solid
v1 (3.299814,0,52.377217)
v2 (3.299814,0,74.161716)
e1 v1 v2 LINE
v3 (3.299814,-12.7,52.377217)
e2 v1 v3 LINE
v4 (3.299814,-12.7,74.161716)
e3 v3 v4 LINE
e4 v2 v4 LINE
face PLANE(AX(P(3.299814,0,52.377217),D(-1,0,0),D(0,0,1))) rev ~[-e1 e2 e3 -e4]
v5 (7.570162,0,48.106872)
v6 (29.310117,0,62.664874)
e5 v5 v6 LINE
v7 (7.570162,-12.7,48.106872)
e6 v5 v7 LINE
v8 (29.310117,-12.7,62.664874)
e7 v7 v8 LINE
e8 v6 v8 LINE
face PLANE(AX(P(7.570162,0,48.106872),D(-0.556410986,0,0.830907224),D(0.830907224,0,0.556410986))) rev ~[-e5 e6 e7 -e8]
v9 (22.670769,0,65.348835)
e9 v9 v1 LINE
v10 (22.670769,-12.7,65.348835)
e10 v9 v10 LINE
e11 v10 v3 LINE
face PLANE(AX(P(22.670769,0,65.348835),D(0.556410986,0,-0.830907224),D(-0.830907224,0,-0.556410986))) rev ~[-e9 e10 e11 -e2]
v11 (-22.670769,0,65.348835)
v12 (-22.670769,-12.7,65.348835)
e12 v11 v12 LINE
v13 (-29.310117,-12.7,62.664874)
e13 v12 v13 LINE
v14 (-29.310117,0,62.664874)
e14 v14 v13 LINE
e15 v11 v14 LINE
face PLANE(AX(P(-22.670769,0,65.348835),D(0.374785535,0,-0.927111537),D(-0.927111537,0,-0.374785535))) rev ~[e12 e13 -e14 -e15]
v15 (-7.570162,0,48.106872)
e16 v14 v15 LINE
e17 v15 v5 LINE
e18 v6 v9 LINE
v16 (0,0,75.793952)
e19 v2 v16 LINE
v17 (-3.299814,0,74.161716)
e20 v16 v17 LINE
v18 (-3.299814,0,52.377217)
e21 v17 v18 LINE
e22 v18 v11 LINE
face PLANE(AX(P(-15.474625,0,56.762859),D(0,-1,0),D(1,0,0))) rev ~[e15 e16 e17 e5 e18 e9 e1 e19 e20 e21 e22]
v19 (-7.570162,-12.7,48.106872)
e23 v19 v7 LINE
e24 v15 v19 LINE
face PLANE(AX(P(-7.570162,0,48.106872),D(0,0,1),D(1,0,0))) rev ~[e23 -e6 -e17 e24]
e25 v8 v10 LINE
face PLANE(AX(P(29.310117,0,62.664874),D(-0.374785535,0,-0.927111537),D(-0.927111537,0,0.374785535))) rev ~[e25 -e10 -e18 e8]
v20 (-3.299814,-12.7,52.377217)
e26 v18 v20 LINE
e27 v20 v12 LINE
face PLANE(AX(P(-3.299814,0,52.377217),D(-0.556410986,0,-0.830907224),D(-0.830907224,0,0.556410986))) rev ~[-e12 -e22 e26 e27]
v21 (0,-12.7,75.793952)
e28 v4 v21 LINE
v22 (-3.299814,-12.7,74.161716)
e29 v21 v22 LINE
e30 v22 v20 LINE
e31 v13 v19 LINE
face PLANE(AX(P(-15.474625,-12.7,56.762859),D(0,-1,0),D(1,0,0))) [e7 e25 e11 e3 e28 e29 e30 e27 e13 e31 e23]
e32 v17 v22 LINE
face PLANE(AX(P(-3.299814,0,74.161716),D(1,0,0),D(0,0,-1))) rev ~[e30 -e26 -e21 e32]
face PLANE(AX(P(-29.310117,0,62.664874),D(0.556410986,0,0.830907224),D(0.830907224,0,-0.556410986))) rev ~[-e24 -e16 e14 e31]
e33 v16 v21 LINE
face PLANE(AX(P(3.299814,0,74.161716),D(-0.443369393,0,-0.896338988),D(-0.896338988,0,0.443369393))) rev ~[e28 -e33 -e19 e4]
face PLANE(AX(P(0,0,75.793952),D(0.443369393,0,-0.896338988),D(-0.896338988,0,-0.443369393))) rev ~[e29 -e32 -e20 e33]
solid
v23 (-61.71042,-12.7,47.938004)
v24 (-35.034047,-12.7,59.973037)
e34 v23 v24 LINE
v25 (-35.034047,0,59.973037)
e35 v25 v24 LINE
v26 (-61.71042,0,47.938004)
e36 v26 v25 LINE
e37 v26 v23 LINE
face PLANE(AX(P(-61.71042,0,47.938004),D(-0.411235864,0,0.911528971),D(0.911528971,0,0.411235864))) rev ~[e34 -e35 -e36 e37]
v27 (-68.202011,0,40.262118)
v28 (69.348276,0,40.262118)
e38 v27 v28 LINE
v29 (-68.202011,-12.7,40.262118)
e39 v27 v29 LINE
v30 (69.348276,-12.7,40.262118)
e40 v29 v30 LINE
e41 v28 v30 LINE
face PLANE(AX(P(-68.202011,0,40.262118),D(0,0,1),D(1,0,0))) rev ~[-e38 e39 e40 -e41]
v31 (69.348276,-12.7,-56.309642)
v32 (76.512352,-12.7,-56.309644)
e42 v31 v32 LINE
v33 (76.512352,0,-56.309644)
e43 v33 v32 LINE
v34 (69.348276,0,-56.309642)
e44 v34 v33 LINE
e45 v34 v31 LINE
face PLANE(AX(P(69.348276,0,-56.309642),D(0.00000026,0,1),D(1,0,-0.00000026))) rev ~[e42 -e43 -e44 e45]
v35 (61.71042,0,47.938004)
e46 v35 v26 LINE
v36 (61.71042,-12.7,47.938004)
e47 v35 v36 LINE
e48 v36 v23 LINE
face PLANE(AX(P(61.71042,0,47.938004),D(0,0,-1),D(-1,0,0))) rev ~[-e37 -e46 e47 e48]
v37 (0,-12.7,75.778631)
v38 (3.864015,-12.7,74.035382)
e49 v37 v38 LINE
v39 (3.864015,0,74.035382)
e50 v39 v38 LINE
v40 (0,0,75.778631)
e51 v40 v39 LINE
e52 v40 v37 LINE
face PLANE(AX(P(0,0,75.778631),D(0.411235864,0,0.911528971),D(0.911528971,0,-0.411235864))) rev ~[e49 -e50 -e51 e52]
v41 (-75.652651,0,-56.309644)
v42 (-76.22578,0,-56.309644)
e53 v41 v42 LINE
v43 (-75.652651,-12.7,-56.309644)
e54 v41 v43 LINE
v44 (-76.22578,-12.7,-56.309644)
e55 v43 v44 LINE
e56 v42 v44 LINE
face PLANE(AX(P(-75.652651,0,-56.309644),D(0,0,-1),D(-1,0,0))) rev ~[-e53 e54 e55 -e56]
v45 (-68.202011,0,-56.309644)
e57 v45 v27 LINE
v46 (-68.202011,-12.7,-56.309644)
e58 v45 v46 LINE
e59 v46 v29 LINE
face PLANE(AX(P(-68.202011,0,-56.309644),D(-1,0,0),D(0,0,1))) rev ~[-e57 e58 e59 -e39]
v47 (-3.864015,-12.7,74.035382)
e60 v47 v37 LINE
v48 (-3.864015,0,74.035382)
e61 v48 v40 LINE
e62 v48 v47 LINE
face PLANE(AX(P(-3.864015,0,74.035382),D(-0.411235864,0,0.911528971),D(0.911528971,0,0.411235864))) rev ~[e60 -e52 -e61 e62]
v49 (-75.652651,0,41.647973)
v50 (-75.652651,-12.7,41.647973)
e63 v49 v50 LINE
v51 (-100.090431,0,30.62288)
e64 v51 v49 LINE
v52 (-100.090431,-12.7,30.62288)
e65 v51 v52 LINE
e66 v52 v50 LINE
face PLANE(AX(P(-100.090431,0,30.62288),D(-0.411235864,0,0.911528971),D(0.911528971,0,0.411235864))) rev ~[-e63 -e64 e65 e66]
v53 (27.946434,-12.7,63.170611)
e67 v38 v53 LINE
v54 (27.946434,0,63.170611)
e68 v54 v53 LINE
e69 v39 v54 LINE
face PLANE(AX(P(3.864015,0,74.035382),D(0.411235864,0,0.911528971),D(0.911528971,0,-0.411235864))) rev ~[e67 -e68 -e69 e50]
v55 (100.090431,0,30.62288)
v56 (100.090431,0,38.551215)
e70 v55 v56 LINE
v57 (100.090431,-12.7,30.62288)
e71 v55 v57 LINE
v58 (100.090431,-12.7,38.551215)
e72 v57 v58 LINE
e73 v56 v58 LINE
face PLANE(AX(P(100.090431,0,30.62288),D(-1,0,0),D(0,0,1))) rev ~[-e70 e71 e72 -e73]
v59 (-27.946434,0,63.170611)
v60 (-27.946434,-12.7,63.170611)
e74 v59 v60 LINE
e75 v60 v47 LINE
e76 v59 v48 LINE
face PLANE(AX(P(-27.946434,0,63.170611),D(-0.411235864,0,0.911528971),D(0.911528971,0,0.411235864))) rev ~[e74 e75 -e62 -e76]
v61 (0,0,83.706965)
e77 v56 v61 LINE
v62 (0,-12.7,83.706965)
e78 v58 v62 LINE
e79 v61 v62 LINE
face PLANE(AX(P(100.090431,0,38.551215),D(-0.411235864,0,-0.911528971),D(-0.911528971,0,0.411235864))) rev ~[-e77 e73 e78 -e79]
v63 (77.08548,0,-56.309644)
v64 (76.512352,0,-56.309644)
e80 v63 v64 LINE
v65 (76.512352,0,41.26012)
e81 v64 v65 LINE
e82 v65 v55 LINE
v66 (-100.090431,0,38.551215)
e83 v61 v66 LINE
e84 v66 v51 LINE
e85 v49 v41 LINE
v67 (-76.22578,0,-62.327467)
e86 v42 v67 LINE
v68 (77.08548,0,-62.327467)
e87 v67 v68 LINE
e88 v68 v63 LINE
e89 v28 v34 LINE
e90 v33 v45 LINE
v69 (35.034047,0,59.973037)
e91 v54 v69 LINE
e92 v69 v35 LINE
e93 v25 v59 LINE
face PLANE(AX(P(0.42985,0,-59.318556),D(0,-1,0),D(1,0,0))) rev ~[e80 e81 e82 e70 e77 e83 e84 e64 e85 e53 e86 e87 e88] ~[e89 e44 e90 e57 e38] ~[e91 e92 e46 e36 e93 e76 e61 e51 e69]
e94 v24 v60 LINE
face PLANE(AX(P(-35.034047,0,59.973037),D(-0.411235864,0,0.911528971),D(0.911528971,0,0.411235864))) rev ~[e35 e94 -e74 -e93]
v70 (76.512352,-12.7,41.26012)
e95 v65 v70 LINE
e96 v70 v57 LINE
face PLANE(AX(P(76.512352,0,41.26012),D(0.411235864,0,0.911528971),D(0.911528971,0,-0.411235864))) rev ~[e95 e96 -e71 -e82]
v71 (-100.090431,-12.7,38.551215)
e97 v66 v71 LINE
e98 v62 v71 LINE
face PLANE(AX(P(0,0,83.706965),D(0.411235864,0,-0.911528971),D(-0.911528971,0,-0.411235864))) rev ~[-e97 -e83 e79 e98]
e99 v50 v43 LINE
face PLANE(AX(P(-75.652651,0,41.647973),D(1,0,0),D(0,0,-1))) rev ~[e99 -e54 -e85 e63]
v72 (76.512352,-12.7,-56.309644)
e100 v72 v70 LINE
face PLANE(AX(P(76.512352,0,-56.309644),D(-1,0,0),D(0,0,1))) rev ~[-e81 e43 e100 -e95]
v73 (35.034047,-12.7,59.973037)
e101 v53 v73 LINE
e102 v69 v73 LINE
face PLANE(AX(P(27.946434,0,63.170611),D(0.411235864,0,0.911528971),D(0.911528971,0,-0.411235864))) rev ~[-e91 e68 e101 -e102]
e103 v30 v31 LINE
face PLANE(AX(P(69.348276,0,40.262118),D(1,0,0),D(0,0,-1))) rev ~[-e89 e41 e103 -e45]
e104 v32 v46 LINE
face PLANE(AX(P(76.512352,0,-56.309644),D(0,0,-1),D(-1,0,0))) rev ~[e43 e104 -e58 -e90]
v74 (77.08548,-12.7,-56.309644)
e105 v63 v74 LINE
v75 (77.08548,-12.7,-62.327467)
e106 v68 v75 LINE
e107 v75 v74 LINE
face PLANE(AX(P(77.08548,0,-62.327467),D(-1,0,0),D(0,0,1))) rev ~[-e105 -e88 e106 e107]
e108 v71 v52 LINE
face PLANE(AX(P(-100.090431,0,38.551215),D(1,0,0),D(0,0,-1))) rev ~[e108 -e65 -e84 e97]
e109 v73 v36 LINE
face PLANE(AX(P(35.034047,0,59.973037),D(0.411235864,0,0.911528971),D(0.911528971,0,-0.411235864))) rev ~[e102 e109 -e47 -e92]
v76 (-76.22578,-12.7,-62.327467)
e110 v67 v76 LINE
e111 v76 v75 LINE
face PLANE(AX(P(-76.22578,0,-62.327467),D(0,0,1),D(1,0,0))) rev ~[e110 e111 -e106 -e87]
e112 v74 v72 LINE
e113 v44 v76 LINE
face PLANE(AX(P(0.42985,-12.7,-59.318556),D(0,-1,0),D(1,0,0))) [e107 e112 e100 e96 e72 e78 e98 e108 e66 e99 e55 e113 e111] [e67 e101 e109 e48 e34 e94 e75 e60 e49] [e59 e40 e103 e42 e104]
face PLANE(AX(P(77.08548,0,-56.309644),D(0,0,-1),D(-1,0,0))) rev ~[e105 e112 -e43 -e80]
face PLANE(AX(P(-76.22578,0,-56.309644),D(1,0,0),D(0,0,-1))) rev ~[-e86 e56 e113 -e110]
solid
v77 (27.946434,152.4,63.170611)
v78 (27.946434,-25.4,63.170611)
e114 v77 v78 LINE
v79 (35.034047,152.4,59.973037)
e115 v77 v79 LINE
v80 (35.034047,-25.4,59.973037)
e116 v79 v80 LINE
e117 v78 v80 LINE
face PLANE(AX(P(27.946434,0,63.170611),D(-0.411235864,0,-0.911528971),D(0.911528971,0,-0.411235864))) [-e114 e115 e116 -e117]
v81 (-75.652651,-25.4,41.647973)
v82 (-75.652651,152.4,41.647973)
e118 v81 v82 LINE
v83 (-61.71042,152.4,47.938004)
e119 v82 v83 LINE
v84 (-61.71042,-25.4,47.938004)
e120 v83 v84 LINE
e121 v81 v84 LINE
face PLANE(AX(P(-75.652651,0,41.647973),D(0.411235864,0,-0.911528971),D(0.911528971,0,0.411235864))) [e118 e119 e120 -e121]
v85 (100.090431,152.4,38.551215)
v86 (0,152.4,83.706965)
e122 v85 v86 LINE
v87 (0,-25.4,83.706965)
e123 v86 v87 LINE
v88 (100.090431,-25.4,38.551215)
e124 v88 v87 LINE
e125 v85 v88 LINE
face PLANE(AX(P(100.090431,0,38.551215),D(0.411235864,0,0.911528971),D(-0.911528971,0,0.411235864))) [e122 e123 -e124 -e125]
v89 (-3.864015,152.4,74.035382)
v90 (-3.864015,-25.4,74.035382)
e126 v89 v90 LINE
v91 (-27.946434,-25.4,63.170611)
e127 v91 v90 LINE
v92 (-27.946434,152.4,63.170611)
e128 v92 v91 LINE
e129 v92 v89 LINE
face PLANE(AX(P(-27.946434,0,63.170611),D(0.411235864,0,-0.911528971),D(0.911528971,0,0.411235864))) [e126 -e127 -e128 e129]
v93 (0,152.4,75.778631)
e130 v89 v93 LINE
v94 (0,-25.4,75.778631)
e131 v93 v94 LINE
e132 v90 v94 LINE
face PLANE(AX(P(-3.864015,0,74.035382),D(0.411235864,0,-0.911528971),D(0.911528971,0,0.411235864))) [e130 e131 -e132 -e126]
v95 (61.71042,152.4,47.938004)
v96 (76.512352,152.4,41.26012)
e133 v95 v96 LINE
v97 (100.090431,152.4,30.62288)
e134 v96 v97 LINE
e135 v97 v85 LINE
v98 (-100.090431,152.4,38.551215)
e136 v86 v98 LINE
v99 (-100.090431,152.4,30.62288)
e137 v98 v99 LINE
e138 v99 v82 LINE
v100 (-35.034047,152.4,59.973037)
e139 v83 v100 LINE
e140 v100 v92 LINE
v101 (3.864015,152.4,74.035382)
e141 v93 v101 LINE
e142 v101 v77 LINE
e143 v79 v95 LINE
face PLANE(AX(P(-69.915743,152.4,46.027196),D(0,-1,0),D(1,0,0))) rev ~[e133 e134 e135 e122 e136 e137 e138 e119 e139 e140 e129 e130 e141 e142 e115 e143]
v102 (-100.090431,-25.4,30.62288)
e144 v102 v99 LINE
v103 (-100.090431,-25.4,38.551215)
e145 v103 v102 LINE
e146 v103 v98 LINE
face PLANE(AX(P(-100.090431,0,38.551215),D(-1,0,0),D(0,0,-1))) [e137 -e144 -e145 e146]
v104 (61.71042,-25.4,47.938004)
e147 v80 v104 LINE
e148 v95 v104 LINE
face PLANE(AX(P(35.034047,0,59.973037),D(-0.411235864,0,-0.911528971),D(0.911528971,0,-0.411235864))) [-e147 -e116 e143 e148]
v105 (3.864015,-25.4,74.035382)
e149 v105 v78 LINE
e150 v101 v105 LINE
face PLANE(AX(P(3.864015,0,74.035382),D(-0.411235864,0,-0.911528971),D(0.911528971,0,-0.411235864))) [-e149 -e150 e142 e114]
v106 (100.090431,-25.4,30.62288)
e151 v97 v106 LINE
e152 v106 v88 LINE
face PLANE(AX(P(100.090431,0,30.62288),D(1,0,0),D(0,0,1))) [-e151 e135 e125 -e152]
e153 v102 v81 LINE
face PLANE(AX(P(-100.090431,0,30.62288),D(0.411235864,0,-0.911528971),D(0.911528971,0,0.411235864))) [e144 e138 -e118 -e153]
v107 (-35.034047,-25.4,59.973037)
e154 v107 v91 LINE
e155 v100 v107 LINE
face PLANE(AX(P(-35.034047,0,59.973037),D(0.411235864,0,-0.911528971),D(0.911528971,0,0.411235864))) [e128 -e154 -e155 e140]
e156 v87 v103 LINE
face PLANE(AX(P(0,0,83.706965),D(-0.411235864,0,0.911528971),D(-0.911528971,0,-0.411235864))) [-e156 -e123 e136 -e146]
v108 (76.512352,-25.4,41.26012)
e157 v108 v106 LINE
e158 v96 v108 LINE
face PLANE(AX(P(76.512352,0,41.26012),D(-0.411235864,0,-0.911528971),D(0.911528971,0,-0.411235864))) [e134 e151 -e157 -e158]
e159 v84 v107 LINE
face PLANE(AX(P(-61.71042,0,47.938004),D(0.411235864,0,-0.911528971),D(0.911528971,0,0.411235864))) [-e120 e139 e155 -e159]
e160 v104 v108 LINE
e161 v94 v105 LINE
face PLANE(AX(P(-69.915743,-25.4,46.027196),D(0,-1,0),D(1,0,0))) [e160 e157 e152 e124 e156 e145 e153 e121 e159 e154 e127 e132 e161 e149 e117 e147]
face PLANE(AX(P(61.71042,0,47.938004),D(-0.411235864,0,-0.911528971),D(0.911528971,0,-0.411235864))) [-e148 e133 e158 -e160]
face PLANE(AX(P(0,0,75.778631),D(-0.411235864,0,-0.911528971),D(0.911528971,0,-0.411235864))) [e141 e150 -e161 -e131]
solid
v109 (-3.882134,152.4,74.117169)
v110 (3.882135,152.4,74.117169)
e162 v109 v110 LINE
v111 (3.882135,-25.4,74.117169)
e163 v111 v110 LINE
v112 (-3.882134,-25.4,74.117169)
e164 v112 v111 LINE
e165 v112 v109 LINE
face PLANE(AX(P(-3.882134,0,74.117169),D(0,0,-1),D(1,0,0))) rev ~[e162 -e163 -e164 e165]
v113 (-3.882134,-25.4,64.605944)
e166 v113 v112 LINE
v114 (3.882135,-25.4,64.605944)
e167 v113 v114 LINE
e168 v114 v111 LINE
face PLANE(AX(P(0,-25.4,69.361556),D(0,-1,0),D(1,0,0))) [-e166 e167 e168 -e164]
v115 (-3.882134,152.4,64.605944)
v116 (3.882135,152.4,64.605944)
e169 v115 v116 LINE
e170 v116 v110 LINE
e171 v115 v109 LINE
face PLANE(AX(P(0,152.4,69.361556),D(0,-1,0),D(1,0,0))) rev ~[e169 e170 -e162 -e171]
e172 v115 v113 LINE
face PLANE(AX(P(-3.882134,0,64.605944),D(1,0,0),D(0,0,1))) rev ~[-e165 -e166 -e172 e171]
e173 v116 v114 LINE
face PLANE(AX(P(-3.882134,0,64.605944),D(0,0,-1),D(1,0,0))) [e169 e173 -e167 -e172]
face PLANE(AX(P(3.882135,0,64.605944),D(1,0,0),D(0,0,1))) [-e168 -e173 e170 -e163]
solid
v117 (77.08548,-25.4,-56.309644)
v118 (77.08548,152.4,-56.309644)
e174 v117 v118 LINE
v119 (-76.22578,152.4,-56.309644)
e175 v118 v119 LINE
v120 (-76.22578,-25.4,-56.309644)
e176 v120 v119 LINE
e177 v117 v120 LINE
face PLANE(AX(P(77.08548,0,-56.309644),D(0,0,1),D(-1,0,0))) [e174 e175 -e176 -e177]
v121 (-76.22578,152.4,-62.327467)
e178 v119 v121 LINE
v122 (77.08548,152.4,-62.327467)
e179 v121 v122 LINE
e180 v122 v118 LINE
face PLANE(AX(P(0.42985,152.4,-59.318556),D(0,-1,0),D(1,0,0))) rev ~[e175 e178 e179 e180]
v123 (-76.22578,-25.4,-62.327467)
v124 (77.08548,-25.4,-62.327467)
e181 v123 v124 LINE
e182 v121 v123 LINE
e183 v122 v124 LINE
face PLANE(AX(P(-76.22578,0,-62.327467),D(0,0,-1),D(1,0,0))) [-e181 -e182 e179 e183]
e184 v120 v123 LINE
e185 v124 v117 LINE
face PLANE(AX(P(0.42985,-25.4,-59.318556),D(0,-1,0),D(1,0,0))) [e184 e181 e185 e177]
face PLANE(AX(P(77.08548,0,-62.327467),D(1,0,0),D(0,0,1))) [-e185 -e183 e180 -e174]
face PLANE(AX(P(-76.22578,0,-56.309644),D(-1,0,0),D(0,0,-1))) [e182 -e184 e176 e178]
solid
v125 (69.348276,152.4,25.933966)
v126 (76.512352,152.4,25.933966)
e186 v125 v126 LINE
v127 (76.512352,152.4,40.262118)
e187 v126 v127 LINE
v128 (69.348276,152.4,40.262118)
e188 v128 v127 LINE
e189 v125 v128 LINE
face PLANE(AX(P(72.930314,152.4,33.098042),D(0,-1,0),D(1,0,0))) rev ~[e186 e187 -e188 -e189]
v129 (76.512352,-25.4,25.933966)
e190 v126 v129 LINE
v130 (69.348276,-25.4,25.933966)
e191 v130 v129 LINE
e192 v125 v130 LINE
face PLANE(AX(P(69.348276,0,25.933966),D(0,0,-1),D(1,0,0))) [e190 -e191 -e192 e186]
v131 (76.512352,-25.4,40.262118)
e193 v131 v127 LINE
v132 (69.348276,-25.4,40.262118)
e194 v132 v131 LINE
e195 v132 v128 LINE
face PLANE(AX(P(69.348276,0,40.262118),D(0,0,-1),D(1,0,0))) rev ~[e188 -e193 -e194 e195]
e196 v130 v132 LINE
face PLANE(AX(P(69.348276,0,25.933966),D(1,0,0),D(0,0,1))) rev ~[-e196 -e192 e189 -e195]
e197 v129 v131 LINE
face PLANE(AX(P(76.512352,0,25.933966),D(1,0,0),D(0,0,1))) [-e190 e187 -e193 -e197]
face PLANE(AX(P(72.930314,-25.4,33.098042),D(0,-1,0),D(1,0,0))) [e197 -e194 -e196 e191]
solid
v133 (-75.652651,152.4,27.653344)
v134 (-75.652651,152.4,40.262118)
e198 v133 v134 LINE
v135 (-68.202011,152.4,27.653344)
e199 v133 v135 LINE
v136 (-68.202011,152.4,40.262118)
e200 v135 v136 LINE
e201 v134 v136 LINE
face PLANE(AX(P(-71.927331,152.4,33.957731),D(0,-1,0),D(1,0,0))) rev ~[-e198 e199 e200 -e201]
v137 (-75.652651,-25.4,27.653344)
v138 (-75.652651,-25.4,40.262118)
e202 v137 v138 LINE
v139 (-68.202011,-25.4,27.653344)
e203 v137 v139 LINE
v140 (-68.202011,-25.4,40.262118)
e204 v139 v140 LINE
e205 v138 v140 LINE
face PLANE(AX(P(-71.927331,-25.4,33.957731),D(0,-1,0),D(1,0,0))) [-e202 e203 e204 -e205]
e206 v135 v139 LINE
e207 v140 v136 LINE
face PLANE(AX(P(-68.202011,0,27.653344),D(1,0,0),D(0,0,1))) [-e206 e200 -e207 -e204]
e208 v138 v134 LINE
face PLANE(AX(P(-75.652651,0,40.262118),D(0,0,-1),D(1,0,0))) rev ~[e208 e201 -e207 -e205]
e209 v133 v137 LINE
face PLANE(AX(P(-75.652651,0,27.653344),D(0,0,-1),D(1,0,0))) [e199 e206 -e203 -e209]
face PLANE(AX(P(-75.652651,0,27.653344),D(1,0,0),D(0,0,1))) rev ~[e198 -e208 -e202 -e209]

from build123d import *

# Parameters (mm, degrees)
F2_DEPTH      = 25.4
F2_DEPTH_BACK = 152.4
F0_W          = 7.4506402016
F0_H          = 12.6087740064
F0_W_2        = 7.1640759706
F0_H_2        = 14.3281519413
F1_W          = 7.7642686665
F1_H          = 9.5112249255
F0_H_3        = 83.9629881084
F3_DEPTH      = 12.7
F6_DEPTH      = 12.7
F4_W          = 5.8232028969
F4_H          = 12.3464902455
F10_DEPTH     = 12.7


# Not quite as in the source:
# - ends of sketch curves that miss each other by under 0.0002 mm in the source are joined


with BuildPart() as f2:
    # F0 (on Front) → F2 (new body, two sides)
    with BuildSketch(Plane.XZ) as f2_sk:
        Polygon((-75.6526514888, 47.9380041004), (-75.6526514888, 41.6479729853), (-61.7104200599, 47.9380041004), align=None)
        Polygon((61.7104200599, 47.9380041004), (76.5123516321, 41.2601196722), (76.5123516321, 47.9380041004), align=None)
        Polygon((-100.0904308233, 30.6228803963), (-75.6526514888, 41.6479729853), (-75.6526514888, 47.9380041004), (-61.7104200599, 47.9380041004), (-35.0340465252, 59.973037404), (-27.9464338127, 63.1706105272), (-3.864014828, 74.0353824624), (0, 75.7786309245), (0, 83.7069652426), (-100.0904308233, 38.5512147144), align=None)
        Polygon((76.5123516321, 47.9380041004), (76.5123516321, 41.2601196722), (100.0904308233, 30.6228803963), (100.0904308233, 38.5512147144), (0, 83.7069652426), (0, 75.7786309245), (3.864014828, 74.0353824624), (27.9464338127, 63.1706105272), (35.0340465252, 59.973037404), (61.7104200599, 47.9380041004), align=None)
    extrude(amount=F2_DEPTH)
    extrude(f2_sk.sketch, amount=-F2_DEPTH_BACK)


with BuildPart() as f2b:
    # F0 (on Front) → F2, piece 2 (new body, two sides)
    with BuildSketch(Plane.XZ) as f2_2_sk:
        Polygon((-75.6526514888, -56.3096441329), (-76.2257799506, -56.3096441329), (-76.2257799506, -62.3274669051), (77.085480094, -62.3274669051), (77.085480094, -56.3096441329), (76.5123516321, -56.3096441329), (69.3482756615, -56.3096441329), (-68.2020112872, -56.3096441329), align=None)
    extrude(amount=F2_DEPTH)
    extrude(f2_2_sk.sketch, amount=-F2_DEPTH_BACK)


with BuildPart() as f2c:
    # F0 (on Front) → F2, piece 3 (new body, two sides)
    with BuildSketch(Plane.XZ) as f2_3_sk:
        with Locations((-71.927331388, 33.9577309787)):
            Rectangle(F0_W, F0_H)
    extrude(amount=F2_DEPTH)
    extrude(f2_3_sk.sketch, amount=-F2_DEPTH_BACK)


with BuildPart() as f2d:
    # F0 (on Front) → F2, piece 4 (new body, two sides)
    with BuildSketch(Plane.XZ) as f2_4_sk:
        with Locations((72.9303136468, 33.0980420113)):
            Rectangle(F0_W_2, F0_H_2)
    extrude(amount=F2_DEPTH)
    extrude(f2_4_sk.sketch, amount=-F2_DEPTH_BACK)


with BuildPart() as f2e:
    # F1 (on Front) → F2, piece 5 (new body, two sides)
    with BuildSketch(Plane.XZ) as f2_5_sk:
        with Locations((2.328e-07, 69.3615563214)):
            Rectangle(F1_W, F1_H)
    extrude(amount=F2_DEPTH)
    extrude(f2_5_sk.sketch, amount=-F2_DEPTH_BACK)


with BuildPart() as f3:
    # F0 (on Front) → F3 (new body)
    with BuildSketch(Plane.XZ):
        Polygon((-75.6526514888, -56.3096441329), (-76.2257799506, -56.3096441329), (-76.2257799506, -62.3274669051), (77.085480094, -62.3274669051), (77.085480094, -56.3096441329), (76.5123516321, -56.3096441329), (69.3482756615, -56.3096441329), (-68.2020112872, -56.3096441329), align=None)
        with Locations((-71.927331388, -14.3281500787)):
            Rectangle(F0_W, F0_H_3)
        with Locations((-71.927331388, 33.9577309787)):
            Rectangle(F0_W, F0_H)
        Polygon((69.3482756615, 25.9339660406), (69.3482756615, -56.3096422702), (76.5123516321, -56.3096441329), (76.5123516321, 25.9339660406), align=None)
        Polygon((-75.6526514888, 41.6479729853), (-75.6526514888, 40.2621179819), (-68.2020112872, 40.2621179819), (69.3482756615, 40.2621179819), (76.5123516321, 40.2621179819), (76.5123516321, 41.2601196722), (61.7104200599, 47.9380041004), (10.3307002624, 47.9380041004), (3.864014828, 47.9380041004), (-3.864014828, 47.9380041004), (-10.3307002624, 47.9380041004), (-61.7104200599, 47.9380041004), align=None)
        with Locations((72.9303136468, 33.0980420113)):
            Rectangle(F0_W_2, F0_H_2)
        Polygon((-100.0904308233, 30.6228803963), (-75.6526514888, 41.6479729853), (-75.6526514888, 47.9380041004), (-61.7104200599, 47.9380041004), (-35.0340465252, 59.973037404), (-27.9464338127, 63.1706105272), (-3.864014828, 74.0353824624), (0, 75.7786309245), (0, 83.7069652426), (-100.0904308233, 38.5512147144), align=None)
        Polygon((-75.6526514888, 47.9380041004), (-75.6526514888, 41.6479729853), (-61.7104200599, 47.9380041004), align=None)
        Polygon((61.7104200599, 47.9380041004), (76.5123516321, 41.2601196722), (76.5123516321, 47.9380041004), align=None)
        Polygon((76.5123516321, 47.9380041004), (76.5123516321, 41.2601196722), (100.0904308233, 30.6228803963), (100.0904308233, 38.5512147144), (0, 83.7069652426), (0, 75.7786309245), (3.864014828, 74.0353824624), (27.9464338127, 63.1706105272), (35.0340465252, 59.973037404), (61.7104200599, 47.9380041004), align=None)
    extrude(amount=F3_DEPTH)


with BuildPart() as f6:
    # F5 (on face) → F6 (new body)
    with BuildSketch(Plane.XZ):
        Polygon((3.6880273838, 55.2862646402), (2.8213392943, 54.8919215798), (2.8213392943, 48.1377206743), (3.6880273838, 48.5300727755), (3.6880273838, 54.9006089568), align=None)
        Polygon((2.8213392943, 61.1069290045), (2.8213392943, 54.8919215798), (3.6880273838, 55.2862646402), (3.6880273838, 61.1069290045), align=None)
        Polygon((2.8213392943, 48.1377206743), (2.8213392943, 54.8919215798), (2.8213392943, 61.1069290045), (-2.8213392943, 61.1069290045), (-3.6880273838, 61.1069290045), (-3.6880273838, 54.9006089568), (-3.6880273838, 48.1377206743), align=None)
        Polygon((24.6090814471, 64.8053437471), (3.6880273838, 55.2862646402), (3.6880273838, 54.9006089568), (3.6880273838, 48.5300727755), (31.4697353526, 61.1069290045), align=None)
        Polygon((-2.8213392943, 61.1069290045), (2.8213392943, 61.1069290045), (2.8213392943, 73.9230662584), (0, 74.0071956538), (-3.6880273838, 74.1171687841), (-3.6880273838, 61.1069290045), align=None)
        Polygon((2.8213392943, 73.9230662584), (2.8213392943, 61.1069290045), (3.6880273838, 61.1069290045), (3.6880273838, 74.1171687841), (0, 74.0071956538), align=None)
        Polygon((-3.6880273838, 48.1068715453), (-3.6880273838, 48.1377206743), (-3.6880273838, 54.9006089568), (-24.8206017808, 64.4673839815), (-32.4158221483, 61.11202389), align=None)
    extrude(amount=F6_DEPTH)


with BuildPart() as f6b:
    # F4 (on Front) → F6, piece 2 (new body)
    with BuildSketch(Plane.XZ):
        with Locations((0, 67.707815617)):
            Rectangle(F4_W, F4_H)
    extrude(amount=F6_DEPTH)


with BuildPart() as f10:
    # F9 (on Front) → F10 (new body)
    with BuildSketch(Plane.XZ):
        Polygon((-7.5701624155, 48.1068715453), (-3.2998144161, 48.1068715453), (-3.2998144161, 52.3772165179), (-22.6707686226, 65.3488352822), (-29.3101165444, 62.664873898), align=None)
        Polygon((-3.2998144161, 52.3772165179), (-3.2998144161, 48.1068715453), (3.2998144161, 48.1068715453), (3.2998144161, 52.3772165179), (3.2998144161, 65.5764713883), (-3.2998144161, 65.5764713883), align=None)
        Polygon((3.2998144161, 52.3772165179), (3.2998144161, 48.1068715453), (7.5701624155, 48.1068715453), (29.3101165444, 62.664873898), (22.6707686226, 65.3488352822), align=None)
        Polygon((-3.2998144161, 74.1617158055), (-3.2998144161, 65.5764713883), (3.2998144161, 65.5764713883), (3.2998144161, 74.1617158055), (0, 75.7939517498), align=None)
    extrude(amount=F10_DEPTH)


solid = Compound([f2.part, f2b.part, f2c.part, f2d.part, f2e.part, f3.part, f10.part])
